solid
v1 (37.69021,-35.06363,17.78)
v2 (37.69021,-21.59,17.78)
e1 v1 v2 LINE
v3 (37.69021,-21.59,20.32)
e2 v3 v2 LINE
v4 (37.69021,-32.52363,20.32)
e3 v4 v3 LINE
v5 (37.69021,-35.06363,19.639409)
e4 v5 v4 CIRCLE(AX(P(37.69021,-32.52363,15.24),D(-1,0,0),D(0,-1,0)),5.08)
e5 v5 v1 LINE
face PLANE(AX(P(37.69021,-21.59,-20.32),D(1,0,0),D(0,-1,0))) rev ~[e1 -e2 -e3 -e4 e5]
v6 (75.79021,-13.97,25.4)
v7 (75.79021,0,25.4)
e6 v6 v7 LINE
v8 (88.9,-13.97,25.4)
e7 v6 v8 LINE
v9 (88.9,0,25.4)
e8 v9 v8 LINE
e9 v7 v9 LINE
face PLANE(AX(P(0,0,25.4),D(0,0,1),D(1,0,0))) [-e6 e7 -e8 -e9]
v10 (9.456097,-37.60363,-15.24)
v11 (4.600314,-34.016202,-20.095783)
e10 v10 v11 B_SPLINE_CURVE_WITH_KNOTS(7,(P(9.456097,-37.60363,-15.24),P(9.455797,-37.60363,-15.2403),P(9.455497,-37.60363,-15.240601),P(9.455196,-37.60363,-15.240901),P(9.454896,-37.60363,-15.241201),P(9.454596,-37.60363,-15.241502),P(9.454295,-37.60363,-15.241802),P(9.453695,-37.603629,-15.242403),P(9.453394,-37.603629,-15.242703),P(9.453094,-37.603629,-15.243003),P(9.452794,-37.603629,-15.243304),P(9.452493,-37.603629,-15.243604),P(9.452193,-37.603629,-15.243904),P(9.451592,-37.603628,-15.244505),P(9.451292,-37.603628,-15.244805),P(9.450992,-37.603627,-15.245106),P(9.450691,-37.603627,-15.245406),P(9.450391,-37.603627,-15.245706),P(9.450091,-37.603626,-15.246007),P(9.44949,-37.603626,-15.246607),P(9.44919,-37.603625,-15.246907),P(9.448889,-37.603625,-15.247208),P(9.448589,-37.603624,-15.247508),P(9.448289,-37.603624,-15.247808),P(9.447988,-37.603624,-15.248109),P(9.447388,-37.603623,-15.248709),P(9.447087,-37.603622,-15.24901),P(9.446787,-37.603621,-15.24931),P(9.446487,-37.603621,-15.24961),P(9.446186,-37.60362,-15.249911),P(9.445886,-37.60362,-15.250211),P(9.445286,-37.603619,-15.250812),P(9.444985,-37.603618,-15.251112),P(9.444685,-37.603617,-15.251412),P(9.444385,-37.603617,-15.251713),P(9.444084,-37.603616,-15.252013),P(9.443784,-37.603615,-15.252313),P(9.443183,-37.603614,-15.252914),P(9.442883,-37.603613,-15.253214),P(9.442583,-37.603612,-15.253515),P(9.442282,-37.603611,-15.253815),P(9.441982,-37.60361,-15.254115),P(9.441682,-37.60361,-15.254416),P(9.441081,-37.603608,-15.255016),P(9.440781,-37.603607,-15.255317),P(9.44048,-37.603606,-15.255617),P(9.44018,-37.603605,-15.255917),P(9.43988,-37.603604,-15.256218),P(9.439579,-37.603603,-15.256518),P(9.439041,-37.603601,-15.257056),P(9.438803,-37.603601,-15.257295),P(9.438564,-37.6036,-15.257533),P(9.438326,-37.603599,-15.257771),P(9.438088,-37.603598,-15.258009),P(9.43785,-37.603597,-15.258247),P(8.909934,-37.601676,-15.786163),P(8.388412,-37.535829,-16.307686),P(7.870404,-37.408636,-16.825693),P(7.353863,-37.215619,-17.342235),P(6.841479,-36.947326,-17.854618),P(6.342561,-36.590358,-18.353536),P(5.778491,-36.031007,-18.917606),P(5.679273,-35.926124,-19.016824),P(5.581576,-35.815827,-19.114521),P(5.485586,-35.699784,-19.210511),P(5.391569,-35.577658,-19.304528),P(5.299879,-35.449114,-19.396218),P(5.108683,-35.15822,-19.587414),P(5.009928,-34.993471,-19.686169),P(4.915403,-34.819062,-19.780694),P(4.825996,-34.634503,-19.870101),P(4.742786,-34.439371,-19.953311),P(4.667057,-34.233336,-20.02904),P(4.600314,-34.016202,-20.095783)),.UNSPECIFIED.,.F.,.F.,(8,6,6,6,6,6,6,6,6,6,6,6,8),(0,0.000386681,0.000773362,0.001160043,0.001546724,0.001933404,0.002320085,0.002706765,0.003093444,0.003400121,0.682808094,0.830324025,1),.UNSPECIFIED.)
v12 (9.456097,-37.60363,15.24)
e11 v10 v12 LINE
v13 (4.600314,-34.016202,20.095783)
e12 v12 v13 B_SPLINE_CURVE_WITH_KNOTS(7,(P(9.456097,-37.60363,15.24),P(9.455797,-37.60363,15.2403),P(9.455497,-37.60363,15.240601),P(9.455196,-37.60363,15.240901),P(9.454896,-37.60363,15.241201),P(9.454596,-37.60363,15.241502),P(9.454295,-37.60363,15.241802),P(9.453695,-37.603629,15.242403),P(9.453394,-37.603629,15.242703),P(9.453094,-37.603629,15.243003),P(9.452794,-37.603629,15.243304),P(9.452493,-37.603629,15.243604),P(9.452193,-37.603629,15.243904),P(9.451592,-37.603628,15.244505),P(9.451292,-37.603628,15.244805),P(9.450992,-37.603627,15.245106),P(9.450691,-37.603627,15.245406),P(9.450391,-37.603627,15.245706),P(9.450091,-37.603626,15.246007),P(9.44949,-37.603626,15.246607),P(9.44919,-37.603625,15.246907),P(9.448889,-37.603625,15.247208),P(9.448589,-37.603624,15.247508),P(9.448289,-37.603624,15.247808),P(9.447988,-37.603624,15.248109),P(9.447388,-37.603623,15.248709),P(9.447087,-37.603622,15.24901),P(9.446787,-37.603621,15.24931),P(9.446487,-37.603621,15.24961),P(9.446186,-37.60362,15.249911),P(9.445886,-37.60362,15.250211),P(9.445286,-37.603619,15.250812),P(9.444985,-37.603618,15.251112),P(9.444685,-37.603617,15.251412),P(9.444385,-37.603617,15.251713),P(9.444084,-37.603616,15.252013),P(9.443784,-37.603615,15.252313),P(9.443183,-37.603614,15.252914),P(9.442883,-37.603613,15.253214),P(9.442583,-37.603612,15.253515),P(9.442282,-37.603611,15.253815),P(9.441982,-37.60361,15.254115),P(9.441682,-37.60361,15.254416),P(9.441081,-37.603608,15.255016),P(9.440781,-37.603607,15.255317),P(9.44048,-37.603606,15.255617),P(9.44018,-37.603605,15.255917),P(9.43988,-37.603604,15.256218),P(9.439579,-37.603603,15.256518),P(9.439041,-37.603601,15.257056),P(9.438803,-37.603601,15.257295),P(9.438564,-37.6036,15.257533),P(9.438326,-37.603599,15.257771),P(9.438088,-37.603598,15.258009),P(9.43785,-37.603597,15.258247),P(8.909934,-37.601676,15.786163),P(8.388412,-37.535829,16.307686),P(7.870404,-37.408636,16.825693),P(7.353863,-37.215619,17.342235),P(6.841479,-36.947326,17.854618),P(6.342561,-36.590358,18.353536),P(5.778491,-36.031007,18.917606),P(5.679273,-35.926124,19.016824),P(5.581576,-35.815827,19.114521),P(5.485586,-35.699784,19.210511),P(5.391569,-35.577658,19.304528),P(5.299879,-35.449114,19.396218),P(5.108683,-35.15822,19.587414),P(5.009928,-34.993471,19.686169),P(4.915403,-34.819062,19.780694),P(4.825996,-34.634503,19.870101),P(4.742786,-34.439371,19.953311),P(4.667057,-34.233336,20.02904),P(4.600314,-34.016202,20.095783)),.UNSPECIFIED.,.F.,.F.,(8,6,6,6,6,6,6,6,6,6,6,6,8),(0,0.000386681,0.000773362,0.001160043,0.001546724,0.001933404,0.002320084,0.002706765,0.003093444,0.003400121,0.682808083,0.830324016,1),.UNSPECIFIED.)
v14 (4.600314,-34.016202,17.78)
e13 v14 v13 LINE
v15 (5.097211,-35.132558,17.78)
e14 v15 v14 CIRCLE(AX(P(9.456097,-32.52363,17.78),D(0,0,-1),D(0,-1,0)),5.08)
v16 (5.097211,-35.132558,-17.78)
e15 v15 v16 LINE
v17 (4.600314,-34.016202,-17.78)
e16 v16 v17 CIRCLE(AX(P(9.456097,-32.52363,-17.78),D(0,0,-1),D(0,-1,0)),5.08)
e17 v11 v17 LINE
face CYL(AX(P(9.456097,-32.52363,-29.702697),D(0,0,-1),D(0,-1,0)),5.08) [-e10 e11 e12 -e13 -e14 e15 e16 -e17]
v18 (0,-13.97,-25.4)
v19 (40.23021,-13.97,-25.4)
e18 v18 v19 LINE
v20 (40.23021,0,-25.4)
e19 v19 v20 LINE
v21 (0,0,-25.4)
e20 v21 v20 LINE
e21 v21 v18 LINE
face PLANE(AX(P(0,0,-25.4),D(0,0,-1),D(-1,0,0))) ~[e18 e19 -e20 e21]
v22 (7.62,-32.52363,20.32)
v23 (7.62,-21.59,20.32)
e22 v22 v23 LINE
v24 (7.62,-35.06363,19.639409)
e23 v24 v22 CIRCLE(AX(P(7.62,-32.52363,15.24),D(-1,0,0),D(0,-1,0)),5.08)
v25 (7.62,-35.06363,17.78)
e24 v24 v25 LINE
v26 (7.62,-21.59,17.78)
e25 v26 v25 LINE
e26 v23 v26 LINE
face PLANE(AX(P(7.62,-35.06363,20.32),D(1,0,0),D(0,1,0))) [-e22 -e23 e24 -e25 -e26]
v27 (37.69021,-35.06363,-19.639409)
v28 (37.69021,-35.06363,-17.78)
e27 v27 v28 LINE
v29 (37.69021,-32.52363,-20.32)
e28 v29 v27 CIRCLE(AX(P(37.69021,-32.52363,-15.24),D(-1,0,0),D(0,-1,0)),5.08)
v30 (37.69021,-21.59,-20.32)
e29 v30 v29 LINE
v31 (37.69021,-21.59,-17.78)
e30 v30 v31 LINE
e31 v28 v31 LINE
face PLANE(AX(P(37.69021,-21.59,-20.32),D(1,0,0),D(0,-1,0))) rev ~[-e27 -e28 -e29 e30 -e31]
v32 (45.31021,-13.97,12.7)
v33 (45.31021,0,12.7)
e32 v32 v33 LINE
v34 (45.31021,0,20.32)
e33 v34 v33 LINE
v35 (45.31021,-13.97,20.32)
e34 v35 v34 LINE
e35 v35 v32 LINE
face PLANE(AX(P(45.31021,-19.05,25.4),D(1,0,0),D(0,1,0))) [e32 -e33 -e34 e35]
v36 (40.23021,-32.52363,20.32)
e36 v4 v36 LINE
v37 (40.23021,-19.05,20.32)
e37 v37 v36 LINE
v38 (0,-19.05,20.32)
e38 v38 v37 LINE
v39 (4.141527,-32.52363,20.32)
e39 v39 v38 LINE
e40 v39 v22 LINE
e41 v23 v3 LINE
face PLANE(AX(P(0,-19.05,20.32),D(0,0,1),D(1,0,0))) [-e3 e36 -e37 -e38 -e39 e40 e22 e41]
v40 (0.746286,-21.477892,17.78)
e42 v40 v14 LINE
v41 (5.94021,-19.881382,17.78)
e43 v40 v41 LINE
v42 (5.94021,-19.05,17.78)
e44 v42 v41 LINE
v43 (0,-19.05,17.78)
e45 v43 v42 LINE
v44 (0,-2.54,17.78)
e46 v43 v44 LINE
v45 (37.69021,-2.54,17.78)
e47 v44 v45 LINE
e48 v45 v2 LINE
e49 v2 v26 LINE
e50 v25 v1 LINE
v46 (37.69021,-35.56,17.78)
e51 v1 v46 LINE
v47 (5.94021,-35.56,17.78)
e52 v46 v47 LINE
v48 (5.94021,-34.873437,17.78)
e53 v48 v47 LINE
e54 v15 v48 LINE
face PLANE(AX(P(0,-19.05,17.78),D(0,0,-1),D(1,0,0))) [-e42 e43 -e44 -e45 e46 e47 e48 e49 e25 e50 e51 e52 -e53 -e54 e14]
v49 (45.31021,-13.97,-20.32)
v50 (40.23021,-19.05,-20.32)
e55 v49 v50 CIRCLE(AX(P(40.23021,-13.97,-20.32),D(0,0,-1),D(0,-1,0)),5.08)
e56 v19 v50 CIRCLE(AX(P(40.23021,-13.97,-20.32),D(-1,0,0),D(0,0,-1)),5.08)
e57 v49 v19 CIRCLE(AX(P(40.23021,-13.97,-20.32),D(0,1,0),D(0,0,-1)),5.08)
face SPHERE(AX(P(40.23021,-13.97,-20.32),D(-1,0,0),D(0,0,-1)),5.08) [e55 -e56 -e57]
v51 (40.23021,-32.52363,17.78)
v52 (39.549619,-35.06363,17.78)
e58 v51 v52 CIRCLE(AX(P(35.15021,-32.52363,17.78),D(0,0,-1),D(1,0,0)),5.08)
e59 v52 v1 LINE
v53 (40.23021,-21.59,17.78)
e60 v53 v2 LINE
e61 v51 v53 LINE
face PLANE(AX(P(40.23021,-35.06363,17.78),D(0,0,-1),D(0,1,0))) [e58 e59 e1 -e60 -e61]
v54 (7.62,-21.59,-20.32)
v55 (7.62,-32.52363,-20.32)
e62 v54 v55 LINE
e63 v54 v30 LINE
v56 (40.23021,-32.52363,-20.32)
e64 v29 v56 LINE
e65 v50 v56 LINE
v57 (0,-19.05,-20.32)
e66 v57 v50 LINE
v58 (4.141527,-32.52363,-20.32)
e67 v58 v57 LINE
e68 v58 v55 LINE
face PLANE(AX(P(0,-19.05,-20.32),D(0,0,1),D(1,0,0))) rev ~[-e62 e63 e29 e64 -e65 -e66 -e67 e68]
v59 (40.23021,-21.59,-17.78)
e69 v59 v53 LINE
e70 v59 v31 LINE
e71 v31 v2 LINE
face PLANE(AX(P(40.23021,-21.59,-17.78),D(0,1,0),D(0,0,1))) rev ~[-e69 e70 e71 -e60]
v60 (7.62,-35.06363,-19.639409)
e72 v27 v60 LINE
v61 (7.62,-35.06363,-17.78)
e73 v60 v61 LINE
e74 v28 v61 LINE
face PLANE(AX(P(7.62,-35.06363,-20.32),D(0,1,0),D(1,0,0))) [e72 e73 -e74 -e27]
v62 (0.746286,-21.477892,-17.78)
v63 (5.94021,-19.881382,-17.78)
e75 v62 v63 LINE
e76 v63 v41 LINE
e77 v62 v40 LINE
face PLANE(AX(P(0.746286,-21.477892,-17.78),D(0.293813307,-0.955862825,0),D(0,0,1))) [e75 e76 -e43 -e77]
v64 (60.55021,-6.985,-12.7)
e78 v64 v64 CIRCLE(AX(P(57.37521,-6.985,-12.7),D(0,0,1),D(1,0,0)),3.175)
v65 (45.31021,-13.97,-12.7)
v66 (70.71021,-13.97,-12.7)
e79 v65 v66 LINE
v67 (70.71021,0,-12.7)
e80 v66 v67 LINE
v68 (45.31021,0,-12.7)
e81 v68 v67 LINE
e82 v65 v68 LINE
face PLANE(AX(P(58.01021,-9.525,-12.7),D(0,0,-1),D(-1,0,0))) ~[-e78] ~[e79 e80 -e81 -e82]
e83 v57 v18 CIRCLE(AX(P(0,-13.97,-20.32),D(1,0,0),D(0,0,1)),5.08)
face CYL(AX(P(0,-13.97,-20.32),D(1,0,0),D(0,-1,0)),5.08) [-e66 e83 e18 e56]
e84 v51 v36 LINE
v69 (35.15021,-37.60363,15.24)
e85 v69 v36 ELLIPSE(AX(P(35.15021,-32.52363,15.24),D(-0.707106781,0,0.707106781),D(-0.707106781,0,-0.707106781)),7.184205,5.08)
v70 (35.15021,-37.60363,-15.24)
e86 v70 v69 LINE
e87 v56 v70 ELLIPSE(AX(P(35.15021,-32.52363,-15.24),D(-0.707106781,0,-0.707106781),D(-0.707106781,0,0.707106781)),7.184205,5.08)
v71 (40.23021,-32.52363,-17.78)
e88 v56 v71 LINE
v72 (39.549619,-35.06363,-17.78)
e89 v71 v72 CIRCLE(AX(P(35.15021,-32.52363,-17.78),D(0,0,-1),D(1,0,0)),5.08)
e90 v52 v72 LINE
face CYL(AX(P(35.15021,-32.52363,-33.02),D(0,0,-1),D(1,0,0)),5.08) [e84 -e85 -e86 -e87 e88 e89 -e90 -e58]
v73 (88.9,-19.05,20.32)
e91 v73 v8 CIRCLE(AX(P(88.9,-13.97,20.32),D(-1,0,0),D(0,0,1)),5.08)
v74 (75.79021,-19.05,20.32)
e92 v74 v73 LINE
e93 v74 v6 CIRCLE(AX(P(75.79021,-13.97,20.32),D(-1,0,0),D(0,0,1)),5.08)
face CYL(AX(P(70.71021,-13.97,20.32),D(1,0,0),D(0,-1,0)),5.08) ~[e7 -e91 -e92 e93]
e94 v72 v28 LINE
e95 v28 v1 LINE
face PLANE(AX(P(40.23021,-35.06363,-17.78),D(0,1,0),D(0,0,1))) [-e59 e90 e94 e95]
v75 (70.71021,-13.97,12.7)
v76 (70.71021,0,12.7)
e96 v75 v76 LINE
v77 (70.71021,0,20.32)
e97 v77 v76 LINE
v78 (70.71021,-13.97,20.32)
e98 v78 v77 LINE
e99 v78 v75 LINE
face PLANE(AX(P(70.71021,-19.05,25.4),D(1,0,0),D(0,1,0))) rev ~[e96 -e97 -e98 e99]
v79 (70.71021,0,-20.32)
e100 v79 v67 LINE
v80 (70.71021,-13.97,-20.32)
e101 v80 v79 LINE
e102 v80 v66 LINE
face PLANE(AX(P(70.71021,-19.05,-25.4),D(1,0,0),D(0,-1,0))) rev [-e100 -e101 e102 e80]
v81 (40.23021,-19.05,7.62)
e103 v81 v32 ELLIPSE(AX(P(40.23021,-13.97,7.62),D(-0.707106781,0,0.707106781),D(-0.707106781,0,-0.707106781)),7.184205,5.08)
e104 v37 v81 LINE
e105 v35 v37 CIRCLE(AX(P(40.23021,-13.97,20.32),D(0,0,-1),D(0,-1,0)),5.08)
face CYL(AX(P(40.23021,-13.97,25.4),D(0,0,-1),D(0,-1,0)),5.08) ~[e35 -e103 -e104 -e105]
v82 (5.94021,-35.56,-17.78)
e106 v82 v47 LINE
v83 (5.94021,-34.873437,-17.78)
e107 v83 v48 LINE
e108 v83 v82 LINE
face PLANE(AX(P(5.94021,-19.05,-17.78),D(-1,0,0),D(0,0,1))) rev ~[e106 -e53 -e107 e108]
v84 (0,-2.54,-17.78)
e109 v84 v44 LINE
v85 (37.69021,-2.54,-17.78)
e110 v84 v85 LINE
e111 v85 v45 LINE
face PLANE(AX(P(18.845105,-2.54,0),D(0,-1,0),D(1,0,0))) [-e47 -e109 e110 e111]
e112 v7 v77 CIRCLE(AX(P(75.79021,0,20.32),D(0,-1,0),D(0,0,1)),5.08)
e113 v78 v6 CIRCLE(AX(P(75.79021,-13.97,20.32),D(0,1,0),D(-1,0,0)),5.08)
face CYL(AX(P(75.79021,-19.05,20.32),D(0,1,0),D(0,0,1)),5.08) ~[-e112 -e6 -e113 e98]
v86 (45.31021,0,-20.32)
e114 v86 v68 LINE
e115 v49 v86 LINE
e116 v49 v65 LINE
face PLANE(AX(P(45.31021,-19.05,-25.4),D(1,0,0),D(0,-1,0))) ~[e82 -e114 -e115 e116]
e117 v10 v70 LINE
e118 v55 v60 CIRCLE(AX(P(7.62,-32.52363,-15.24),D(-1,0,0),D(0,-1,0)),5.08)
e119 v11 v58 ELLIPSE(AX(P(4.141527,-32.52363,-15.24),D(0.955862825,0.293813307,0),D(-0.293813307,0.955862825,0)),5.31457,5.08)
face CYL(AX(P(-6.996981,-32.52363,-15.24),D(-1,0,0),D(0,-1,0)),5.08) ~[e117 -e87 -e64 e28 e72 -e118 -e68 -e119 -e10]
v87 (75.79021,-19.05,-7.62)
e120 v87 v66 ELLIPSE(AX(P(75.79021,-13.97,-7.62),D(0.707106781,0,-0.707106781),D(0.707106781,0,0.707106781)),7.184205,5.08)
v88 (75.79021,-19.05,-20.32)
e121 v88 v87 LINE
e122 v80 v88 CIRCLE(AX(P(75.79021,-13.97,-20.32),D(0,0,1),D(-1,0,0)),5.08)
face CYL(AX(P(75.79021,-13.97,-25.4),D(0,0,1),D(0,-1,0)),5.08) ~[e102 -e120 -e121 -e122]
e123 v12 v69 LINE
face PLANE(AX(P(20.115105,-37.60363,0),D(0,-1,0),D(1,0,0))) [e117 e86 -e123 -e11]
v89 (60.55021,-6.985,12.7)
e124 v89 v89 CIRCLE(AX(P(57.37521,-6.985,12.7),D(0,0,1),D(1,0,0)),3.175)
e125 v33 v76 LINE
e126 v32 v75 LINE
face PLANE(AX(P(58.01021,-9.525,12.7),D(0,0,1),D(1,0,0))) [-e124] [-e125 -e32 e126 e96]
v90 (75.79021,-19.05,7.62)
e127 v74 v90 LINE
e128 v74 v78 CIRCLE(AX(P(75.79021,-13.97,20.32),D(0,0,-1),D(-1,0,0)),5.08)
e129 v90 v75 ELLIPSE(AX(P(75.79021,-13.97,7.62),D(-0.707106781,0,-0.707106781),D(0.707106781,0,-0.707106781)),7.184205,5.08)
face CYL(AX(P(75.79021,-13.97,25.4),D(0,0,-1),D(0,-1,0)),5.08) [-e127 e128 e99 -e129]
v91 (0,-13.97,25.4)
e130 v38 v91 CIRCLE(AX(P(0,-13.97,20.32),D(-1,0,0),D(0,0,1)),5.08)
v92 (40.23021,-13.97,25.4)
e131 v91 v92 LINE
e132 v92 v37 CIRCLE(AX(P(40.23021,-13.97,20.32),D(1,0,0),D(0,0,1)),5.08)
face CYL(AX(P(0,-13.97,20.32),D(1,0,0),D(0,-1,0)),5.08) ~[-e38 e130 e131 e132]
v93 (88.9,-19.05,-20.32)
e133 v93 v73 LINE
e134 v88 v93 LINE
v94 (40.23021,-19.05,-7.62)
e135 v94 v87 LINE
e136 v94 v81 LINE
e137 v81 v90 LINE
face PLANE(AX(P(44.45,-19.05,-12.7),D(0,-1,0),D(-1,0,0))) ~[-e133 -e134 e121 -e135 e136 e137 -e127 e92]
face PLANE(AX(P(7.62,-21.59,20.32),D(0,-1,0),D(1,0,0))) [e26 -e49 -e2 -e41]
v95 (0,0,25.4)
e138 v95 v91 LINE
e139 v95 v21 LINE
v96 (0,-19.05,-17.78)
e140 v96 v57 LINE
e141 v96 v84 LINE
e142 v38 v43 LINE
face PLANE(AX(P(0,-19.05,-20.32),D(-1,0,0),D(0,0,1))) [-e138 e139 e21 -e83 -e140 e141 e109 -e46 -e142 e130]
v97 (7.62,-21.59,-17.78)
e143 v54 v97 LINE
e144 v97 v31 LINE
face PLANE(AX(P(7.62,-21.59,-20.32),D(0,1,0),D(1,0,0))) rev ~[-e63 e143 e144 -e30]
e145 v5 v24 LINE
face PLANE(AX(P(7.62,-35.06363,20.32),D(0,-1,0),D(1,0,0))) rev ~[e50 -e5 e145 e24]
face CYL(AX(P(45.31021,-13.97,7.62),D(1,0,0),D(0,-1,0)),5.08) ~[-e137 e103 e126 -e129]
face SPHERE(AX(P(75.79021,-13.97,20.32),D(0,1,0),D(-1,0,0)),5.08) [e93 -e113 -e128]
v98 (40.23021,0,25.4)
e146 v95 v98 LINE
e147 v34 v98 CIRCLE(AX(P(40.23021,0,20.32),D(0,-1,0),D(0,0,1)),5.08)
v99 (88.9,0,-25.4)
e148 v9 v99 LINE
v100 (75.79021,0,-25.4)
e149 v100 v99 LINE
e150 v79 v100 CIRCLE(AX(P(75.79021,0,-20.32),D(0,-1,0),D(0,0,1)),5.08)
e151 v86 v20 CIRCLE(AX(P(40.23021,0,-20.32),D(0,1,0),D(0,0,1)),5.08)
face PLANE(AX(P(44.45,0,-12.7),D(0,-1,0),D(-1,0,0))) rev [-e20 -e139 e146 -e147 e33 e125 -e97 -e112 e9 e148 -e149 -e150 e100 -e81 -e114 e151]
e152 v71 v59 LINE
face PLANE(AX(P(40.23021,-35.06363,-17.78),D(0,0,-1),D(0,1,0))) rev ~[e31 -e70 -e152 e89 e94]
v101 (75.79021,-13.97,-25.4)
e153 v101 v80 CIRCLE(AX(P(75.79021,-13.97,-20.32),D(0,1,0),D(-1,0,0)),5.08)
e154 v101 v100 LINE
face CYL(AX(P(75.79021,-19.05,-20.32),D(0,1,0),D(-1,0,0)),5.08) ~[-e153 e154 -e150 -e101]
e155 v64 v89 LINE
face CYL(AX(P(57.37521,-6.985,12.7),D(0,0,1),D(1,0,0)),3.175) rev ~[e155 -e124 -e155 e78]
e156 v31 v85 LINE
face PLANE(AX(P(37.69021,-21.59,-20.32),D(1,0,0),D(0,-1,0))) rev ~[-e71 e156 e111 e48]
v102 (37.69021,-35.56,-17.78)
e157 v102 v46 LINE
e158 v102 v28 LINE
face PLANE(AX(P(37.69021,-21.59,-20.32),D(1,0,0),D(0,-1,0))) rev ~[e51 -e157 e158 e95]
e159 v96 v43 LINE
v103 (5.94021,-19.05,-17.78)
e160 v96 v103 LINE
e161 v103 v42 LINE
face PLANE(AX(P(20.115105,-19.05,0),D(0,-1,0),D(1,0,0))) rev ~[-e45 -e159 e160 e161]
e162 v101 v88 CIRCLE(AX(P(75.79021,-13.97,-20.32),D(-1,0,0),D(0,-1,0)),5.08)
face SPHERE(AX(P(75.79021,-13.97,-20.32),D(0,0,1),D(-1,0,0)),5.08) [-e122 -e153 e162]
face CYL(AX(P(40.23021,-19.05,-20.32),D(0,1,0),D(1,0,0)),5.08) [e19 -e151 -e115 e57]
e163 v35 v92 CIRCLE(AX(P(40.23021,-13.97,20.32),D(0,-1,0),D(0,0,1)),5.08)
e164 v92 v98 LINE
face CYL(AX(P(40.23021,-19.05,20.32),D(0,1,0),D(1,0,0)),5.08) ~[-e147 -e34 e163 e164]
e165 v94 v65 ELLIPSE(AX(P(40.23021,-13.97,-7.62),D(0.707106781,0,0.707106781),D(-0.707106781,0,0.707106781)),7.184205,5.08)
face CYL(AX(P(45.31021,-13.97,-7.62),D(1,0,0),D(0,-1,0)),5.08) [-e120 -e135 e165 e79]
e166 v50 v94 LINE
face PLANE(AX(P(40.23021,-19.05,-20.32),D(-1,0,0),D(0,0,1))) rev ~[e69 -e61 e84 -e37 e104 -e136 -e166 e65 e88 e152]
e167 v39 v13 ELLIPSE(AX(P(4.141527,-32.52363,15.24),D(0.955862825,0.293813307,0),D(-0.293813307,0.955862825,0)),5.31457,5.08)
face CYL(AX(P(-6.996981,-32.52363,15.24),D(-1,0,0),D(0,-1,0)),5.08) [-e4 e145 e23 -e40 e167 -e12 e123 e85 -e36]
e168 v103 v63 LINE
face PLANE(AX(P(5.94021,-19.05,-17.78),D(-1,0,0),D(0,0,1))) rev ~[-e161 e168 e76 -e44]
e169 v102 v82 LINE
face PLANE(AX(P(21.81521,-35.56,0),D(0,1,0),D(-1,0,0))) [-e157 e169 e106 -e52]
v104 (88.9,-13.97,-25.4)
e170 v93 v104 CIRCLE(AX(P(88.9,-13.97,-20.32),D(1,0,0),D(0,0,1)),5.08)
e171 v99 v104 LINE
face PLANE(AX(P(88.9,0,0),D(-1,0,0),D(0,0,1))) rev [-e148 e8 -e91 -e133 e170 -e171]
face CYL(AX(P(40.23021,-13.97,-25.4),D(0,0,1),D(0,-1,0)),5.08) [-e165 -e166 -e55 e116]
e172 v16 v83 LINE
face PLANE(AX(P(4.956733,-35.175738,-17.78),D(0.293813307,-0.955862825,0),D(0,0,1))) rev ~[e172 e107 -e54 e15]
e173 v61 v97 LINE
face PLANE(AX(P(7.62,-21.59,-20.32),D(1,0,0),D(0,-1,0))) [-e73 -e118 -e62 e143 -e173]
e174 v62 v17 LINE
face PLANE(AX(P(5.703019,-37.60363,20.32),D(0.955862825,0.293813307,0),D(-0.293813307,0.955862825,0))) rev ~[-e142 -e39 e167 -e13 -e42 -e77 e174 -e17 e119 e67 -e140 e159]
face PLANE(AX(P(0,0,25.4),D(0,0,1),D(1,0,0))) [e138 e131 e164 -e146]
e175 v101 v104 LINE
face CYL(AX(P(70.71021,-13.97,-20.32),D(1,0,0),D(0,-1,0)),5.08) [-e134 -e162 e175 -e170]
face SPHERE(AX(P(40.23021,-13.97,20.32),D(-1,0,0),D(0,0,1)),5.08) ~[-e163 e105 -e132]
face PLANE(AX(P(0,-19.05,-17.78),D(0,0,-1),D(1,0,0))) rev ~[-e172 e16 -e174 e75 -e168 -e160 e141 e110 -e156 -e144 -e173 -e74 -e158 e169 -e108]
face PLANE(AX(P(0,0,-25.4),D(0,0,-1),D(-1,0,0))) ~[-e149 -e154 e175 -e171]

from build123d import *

# Parameters (mm, degrees)
F0_W         = 88.9
F0_H         = 25.4
F1_DEPTH     = 19.05
F2_W         = 25.4
F2_H         = 19.05
F3_DEPTH     = 12.7
F4_R         = 3.175
F5_DEPTH     = 12.7
F7_R         = 5.08
F8_W         = 37.6902104366
F8_H         = 35.56
F9_DEPTH     = 16.51
F10_W        = 40.2302104366
F10_H        = 40.64
F11_DEPTH    = 18.55363
F12_W        = 31.75
F12_H        = 35.56
F13_DEPTH    = 16.51
F14_W        = 30.0702104366
F14_H        = 13.47363
F15_DEPTH    = 2.54
F16_W        = 30.0702104366
F16_H        = 13.47363
F17_DEPTH    = 2.54
F19_DEPTH    = 50.8
F20_W        = 14.3303479189
F20_H        = 35.56
F21_DEPTH    = 7.62
F22_W        = 13.47363
F22_H        = 35.56
F23_DEPTH    = 5.08
F24_T1_DEPTH = 59.4053934524
F24_T3_DEPTH = 59.927191924
F24_T5_DEPTH = 66.04


# Not quite as in the source:
# - a fillet or chamfer that OpenCascade refuses, or shapes differently, is made with other operations: its cross-section is extruded or revolved along the edge and cut away or added


with BuildPart() as f1:
    # F0 (on Front) → F1 (new body)
    with BuildSketch(Plane.XZ):
        with Locations((44.45, 12.7)):
            Rectangle(F0_W, F0_H)
    extrude(amount=F1_DEPTH)

    # F2 (on face) → F3 (cut)
    with BuildSketch(Plane.XY.offset(25.4)):
        with Locations((58.0102104366, -9.525)):
            Rectangle(F2_W, F2_H)
    extrude(amount=-F3_DEPTH, mode=Mode.SUBTRACT)

    # F4 (on face) → F5 (cut)
    with BuildSketch(Plane.XY.offset(12.7)):
        with Locations((57.3752104366, -6.985)):
            Circle(F4_R)
    extrude(amount=-F5_DEPTH, mode=Mode.SUBTRACT)

    # F6: F1 across plane


with BuildPart() as f1_1:
    add(f1.part)
    add(f1.part.mirror(Plane.XY))

    # F7
    f7_edges = [f1_1.edges().sort_by_distance(p)[0] for p in [
        (22.655105, -19.05, -25.4),
        (22.655105, -19.05, 25.4),
        (45.31021, -9.525, -25.4),
        (45.31021, -19.05, -19.05),
        (70.71021, -19.05, -19.05),
        (70.71021, -9.525, -25.4),
        (70.71021, -9.525, 25.4),
        (70.71021, -19.05, 19.05),
        (45.31021, -9.525, 25.4),
        (45.31021, -19.05, 19.05),
        (58.01021, -19.05, -12.7),
        (58.01021, -19.05, 12.7),
        (79.805105, -19.05, -25.4),
        (79.805105, -19.05, 25.4),
    ]]
    fillet(f7_edges, radius=F7_R)

    # F8 (on face) → F9 (cut)
    with BuildSketch(Plane.XZ.offset(19.05)):
        with Locations((18.8451052183, 0)):
            Rectangle(F8_W, F8_H)
    extrude(amount=-F9_DEPTH, mode=Mode.SUBTRACT)

    # F10 (on face) → F11 (join)
    with BuildSketch(Plane.XZ.offset(19.05)):
        with Locations((20.1151052183, 0)):
            Rectangle(F10_W, F10_H)
    extrude(amount=F11_DEPTH)

    # F12 (on face) → F13 (cut)
    with BuildSketch(Plane(origin=(0, -19.05, 0), x_dir=(-1, 0, 0), z_dir=(0, 1, 0))):
        with Locations((-21.8152104366, 0)):
            Rectangle(F12_W, F12_H)
    extrude(amount=-F13_DEPTH, mode=Mode.SUBTRACT)

    # F14 (on face) → F15 (cut)
    with BuildSketch(Plane(origin=(0, 0, -20.32), x_dir=(1, 0, 0), z_dir=(0, 0, -1))):
        with Locations((22.6551052183, 28.326815)):
            Rectangle(F14_W, F14_H)
    extrude(amount=-F15_DEPTH, mode=Mode.SUBTRACT)

    # F16 (on face) → F17 (cut)
    with BuildSketch(Plane.XY.offset(20.32)):
        with Locations((22.6551052183, -28.326815)):
            Rectangle(F16_W, F16_H)
    extrude(amount=-F17_DEPTH, mode=Mode.SUBTRACT)

    # F18 (on face) → F19 (cut)
    with BuildSketch(Plane.XY.offset(20.32)):
        Polygon((0, -37.60363), (5.7030185126, -37.60363), (0, -19.05), align=None)
    extrude(amount=-F19_DEPTH, mode=Mode.SUBTRACT)

    # F20 (on face) → F21 (cut)
    with BuildSketch(Plane(origin=(-5.3501013979, -1.6445152413, 0), x_dir=(0.293813307, -0.9558628252, 0), z_dir=(-0.9558628252, -0.293813307, 0))):
        with Locations((27.9143607796, 0)):
            Rectangle(F20_W, F20_H)
    extrude(amount=-F21_DEPTH, mode=Mode.SUBTRACT)

    # F22 (on face) → F23 (cut)
    with BuildSketch(Plane.YZ.offset(40.2302104366)):
        with Locations((-28.326815, 0)):
            Rectangle(F22_W, F22_H)
    extrude(amount=-F23_DEPTH, mode=Mode.SUBTRACT)

    # F24: fillet of radius 5.08 on 4 edges, made by hand

    # F24_s2 → F24_t1 (cut)
    with BuildSketch(Plane.XY.offset(-29.7026967262)):
        with BuildLine():
            ThreePointArc((9.4560972031, -37.60363), (6.4374769658, -36.6094997805), (4.600314051, -34.0162015997))
            Line((4.600314051, -34.0162015997), (5.7030185126, -37.60363))
            Line((5.7030185126, -37.60363), (9.4560972031, -37.60363))
        make_face()
    extrude(amount=F24_T1_DEPTH, mode=Mode.SUBTRACT)

    # F24_s4 → F24_t3 (cut)
    with BuildSketch(Plane.YZ.offset(-6.9969814874)):
        with BuildLine():
            ThreePointArc((-37.60363, 15.24), (-36.1157324484, 18.8321024484), (-32.52363, 20.32))
            Line((-32.52363, 20.32), (-37.60363, 20.32))
            Line((-37.60363, 20.32), (-37.60363, 15.24))
        make_face()
        with BuildLine():
            ThreePointArc((-37.60363, -15.24), (-36.1157324484, -18.8321024484), (-32.52363, -20.32))
            Line((-32.52363, -20.32), (-37.60363, -20.32))
            Line((-37.60363, -20.32), (-37.60363, -15.24))
        make_face()
    extrude(amount=F24_T3_DEPTH, mode=Mode.SUBTRACT)

    # F24_s6 → F24_t5 (cut)
    with BuildSketch(Plane.XY.offset(-33.02)):
        with BuildLine():
            ThreePointArc((40.2302104366, -32.52363), (38.742312885, -36.1157324484), (35.1502104366, -37.60363))
            Line((35.1502104366, -37.60363), (40.2302104366, -37.60363))
            Line((40.2302104366, -37.60363), (40.2302104366, -32.52363))
        make_face()
    extrude(amount=F24_T5_DEPTH, mode=Mode.SUBTRACT)


solid = f1_1.part
